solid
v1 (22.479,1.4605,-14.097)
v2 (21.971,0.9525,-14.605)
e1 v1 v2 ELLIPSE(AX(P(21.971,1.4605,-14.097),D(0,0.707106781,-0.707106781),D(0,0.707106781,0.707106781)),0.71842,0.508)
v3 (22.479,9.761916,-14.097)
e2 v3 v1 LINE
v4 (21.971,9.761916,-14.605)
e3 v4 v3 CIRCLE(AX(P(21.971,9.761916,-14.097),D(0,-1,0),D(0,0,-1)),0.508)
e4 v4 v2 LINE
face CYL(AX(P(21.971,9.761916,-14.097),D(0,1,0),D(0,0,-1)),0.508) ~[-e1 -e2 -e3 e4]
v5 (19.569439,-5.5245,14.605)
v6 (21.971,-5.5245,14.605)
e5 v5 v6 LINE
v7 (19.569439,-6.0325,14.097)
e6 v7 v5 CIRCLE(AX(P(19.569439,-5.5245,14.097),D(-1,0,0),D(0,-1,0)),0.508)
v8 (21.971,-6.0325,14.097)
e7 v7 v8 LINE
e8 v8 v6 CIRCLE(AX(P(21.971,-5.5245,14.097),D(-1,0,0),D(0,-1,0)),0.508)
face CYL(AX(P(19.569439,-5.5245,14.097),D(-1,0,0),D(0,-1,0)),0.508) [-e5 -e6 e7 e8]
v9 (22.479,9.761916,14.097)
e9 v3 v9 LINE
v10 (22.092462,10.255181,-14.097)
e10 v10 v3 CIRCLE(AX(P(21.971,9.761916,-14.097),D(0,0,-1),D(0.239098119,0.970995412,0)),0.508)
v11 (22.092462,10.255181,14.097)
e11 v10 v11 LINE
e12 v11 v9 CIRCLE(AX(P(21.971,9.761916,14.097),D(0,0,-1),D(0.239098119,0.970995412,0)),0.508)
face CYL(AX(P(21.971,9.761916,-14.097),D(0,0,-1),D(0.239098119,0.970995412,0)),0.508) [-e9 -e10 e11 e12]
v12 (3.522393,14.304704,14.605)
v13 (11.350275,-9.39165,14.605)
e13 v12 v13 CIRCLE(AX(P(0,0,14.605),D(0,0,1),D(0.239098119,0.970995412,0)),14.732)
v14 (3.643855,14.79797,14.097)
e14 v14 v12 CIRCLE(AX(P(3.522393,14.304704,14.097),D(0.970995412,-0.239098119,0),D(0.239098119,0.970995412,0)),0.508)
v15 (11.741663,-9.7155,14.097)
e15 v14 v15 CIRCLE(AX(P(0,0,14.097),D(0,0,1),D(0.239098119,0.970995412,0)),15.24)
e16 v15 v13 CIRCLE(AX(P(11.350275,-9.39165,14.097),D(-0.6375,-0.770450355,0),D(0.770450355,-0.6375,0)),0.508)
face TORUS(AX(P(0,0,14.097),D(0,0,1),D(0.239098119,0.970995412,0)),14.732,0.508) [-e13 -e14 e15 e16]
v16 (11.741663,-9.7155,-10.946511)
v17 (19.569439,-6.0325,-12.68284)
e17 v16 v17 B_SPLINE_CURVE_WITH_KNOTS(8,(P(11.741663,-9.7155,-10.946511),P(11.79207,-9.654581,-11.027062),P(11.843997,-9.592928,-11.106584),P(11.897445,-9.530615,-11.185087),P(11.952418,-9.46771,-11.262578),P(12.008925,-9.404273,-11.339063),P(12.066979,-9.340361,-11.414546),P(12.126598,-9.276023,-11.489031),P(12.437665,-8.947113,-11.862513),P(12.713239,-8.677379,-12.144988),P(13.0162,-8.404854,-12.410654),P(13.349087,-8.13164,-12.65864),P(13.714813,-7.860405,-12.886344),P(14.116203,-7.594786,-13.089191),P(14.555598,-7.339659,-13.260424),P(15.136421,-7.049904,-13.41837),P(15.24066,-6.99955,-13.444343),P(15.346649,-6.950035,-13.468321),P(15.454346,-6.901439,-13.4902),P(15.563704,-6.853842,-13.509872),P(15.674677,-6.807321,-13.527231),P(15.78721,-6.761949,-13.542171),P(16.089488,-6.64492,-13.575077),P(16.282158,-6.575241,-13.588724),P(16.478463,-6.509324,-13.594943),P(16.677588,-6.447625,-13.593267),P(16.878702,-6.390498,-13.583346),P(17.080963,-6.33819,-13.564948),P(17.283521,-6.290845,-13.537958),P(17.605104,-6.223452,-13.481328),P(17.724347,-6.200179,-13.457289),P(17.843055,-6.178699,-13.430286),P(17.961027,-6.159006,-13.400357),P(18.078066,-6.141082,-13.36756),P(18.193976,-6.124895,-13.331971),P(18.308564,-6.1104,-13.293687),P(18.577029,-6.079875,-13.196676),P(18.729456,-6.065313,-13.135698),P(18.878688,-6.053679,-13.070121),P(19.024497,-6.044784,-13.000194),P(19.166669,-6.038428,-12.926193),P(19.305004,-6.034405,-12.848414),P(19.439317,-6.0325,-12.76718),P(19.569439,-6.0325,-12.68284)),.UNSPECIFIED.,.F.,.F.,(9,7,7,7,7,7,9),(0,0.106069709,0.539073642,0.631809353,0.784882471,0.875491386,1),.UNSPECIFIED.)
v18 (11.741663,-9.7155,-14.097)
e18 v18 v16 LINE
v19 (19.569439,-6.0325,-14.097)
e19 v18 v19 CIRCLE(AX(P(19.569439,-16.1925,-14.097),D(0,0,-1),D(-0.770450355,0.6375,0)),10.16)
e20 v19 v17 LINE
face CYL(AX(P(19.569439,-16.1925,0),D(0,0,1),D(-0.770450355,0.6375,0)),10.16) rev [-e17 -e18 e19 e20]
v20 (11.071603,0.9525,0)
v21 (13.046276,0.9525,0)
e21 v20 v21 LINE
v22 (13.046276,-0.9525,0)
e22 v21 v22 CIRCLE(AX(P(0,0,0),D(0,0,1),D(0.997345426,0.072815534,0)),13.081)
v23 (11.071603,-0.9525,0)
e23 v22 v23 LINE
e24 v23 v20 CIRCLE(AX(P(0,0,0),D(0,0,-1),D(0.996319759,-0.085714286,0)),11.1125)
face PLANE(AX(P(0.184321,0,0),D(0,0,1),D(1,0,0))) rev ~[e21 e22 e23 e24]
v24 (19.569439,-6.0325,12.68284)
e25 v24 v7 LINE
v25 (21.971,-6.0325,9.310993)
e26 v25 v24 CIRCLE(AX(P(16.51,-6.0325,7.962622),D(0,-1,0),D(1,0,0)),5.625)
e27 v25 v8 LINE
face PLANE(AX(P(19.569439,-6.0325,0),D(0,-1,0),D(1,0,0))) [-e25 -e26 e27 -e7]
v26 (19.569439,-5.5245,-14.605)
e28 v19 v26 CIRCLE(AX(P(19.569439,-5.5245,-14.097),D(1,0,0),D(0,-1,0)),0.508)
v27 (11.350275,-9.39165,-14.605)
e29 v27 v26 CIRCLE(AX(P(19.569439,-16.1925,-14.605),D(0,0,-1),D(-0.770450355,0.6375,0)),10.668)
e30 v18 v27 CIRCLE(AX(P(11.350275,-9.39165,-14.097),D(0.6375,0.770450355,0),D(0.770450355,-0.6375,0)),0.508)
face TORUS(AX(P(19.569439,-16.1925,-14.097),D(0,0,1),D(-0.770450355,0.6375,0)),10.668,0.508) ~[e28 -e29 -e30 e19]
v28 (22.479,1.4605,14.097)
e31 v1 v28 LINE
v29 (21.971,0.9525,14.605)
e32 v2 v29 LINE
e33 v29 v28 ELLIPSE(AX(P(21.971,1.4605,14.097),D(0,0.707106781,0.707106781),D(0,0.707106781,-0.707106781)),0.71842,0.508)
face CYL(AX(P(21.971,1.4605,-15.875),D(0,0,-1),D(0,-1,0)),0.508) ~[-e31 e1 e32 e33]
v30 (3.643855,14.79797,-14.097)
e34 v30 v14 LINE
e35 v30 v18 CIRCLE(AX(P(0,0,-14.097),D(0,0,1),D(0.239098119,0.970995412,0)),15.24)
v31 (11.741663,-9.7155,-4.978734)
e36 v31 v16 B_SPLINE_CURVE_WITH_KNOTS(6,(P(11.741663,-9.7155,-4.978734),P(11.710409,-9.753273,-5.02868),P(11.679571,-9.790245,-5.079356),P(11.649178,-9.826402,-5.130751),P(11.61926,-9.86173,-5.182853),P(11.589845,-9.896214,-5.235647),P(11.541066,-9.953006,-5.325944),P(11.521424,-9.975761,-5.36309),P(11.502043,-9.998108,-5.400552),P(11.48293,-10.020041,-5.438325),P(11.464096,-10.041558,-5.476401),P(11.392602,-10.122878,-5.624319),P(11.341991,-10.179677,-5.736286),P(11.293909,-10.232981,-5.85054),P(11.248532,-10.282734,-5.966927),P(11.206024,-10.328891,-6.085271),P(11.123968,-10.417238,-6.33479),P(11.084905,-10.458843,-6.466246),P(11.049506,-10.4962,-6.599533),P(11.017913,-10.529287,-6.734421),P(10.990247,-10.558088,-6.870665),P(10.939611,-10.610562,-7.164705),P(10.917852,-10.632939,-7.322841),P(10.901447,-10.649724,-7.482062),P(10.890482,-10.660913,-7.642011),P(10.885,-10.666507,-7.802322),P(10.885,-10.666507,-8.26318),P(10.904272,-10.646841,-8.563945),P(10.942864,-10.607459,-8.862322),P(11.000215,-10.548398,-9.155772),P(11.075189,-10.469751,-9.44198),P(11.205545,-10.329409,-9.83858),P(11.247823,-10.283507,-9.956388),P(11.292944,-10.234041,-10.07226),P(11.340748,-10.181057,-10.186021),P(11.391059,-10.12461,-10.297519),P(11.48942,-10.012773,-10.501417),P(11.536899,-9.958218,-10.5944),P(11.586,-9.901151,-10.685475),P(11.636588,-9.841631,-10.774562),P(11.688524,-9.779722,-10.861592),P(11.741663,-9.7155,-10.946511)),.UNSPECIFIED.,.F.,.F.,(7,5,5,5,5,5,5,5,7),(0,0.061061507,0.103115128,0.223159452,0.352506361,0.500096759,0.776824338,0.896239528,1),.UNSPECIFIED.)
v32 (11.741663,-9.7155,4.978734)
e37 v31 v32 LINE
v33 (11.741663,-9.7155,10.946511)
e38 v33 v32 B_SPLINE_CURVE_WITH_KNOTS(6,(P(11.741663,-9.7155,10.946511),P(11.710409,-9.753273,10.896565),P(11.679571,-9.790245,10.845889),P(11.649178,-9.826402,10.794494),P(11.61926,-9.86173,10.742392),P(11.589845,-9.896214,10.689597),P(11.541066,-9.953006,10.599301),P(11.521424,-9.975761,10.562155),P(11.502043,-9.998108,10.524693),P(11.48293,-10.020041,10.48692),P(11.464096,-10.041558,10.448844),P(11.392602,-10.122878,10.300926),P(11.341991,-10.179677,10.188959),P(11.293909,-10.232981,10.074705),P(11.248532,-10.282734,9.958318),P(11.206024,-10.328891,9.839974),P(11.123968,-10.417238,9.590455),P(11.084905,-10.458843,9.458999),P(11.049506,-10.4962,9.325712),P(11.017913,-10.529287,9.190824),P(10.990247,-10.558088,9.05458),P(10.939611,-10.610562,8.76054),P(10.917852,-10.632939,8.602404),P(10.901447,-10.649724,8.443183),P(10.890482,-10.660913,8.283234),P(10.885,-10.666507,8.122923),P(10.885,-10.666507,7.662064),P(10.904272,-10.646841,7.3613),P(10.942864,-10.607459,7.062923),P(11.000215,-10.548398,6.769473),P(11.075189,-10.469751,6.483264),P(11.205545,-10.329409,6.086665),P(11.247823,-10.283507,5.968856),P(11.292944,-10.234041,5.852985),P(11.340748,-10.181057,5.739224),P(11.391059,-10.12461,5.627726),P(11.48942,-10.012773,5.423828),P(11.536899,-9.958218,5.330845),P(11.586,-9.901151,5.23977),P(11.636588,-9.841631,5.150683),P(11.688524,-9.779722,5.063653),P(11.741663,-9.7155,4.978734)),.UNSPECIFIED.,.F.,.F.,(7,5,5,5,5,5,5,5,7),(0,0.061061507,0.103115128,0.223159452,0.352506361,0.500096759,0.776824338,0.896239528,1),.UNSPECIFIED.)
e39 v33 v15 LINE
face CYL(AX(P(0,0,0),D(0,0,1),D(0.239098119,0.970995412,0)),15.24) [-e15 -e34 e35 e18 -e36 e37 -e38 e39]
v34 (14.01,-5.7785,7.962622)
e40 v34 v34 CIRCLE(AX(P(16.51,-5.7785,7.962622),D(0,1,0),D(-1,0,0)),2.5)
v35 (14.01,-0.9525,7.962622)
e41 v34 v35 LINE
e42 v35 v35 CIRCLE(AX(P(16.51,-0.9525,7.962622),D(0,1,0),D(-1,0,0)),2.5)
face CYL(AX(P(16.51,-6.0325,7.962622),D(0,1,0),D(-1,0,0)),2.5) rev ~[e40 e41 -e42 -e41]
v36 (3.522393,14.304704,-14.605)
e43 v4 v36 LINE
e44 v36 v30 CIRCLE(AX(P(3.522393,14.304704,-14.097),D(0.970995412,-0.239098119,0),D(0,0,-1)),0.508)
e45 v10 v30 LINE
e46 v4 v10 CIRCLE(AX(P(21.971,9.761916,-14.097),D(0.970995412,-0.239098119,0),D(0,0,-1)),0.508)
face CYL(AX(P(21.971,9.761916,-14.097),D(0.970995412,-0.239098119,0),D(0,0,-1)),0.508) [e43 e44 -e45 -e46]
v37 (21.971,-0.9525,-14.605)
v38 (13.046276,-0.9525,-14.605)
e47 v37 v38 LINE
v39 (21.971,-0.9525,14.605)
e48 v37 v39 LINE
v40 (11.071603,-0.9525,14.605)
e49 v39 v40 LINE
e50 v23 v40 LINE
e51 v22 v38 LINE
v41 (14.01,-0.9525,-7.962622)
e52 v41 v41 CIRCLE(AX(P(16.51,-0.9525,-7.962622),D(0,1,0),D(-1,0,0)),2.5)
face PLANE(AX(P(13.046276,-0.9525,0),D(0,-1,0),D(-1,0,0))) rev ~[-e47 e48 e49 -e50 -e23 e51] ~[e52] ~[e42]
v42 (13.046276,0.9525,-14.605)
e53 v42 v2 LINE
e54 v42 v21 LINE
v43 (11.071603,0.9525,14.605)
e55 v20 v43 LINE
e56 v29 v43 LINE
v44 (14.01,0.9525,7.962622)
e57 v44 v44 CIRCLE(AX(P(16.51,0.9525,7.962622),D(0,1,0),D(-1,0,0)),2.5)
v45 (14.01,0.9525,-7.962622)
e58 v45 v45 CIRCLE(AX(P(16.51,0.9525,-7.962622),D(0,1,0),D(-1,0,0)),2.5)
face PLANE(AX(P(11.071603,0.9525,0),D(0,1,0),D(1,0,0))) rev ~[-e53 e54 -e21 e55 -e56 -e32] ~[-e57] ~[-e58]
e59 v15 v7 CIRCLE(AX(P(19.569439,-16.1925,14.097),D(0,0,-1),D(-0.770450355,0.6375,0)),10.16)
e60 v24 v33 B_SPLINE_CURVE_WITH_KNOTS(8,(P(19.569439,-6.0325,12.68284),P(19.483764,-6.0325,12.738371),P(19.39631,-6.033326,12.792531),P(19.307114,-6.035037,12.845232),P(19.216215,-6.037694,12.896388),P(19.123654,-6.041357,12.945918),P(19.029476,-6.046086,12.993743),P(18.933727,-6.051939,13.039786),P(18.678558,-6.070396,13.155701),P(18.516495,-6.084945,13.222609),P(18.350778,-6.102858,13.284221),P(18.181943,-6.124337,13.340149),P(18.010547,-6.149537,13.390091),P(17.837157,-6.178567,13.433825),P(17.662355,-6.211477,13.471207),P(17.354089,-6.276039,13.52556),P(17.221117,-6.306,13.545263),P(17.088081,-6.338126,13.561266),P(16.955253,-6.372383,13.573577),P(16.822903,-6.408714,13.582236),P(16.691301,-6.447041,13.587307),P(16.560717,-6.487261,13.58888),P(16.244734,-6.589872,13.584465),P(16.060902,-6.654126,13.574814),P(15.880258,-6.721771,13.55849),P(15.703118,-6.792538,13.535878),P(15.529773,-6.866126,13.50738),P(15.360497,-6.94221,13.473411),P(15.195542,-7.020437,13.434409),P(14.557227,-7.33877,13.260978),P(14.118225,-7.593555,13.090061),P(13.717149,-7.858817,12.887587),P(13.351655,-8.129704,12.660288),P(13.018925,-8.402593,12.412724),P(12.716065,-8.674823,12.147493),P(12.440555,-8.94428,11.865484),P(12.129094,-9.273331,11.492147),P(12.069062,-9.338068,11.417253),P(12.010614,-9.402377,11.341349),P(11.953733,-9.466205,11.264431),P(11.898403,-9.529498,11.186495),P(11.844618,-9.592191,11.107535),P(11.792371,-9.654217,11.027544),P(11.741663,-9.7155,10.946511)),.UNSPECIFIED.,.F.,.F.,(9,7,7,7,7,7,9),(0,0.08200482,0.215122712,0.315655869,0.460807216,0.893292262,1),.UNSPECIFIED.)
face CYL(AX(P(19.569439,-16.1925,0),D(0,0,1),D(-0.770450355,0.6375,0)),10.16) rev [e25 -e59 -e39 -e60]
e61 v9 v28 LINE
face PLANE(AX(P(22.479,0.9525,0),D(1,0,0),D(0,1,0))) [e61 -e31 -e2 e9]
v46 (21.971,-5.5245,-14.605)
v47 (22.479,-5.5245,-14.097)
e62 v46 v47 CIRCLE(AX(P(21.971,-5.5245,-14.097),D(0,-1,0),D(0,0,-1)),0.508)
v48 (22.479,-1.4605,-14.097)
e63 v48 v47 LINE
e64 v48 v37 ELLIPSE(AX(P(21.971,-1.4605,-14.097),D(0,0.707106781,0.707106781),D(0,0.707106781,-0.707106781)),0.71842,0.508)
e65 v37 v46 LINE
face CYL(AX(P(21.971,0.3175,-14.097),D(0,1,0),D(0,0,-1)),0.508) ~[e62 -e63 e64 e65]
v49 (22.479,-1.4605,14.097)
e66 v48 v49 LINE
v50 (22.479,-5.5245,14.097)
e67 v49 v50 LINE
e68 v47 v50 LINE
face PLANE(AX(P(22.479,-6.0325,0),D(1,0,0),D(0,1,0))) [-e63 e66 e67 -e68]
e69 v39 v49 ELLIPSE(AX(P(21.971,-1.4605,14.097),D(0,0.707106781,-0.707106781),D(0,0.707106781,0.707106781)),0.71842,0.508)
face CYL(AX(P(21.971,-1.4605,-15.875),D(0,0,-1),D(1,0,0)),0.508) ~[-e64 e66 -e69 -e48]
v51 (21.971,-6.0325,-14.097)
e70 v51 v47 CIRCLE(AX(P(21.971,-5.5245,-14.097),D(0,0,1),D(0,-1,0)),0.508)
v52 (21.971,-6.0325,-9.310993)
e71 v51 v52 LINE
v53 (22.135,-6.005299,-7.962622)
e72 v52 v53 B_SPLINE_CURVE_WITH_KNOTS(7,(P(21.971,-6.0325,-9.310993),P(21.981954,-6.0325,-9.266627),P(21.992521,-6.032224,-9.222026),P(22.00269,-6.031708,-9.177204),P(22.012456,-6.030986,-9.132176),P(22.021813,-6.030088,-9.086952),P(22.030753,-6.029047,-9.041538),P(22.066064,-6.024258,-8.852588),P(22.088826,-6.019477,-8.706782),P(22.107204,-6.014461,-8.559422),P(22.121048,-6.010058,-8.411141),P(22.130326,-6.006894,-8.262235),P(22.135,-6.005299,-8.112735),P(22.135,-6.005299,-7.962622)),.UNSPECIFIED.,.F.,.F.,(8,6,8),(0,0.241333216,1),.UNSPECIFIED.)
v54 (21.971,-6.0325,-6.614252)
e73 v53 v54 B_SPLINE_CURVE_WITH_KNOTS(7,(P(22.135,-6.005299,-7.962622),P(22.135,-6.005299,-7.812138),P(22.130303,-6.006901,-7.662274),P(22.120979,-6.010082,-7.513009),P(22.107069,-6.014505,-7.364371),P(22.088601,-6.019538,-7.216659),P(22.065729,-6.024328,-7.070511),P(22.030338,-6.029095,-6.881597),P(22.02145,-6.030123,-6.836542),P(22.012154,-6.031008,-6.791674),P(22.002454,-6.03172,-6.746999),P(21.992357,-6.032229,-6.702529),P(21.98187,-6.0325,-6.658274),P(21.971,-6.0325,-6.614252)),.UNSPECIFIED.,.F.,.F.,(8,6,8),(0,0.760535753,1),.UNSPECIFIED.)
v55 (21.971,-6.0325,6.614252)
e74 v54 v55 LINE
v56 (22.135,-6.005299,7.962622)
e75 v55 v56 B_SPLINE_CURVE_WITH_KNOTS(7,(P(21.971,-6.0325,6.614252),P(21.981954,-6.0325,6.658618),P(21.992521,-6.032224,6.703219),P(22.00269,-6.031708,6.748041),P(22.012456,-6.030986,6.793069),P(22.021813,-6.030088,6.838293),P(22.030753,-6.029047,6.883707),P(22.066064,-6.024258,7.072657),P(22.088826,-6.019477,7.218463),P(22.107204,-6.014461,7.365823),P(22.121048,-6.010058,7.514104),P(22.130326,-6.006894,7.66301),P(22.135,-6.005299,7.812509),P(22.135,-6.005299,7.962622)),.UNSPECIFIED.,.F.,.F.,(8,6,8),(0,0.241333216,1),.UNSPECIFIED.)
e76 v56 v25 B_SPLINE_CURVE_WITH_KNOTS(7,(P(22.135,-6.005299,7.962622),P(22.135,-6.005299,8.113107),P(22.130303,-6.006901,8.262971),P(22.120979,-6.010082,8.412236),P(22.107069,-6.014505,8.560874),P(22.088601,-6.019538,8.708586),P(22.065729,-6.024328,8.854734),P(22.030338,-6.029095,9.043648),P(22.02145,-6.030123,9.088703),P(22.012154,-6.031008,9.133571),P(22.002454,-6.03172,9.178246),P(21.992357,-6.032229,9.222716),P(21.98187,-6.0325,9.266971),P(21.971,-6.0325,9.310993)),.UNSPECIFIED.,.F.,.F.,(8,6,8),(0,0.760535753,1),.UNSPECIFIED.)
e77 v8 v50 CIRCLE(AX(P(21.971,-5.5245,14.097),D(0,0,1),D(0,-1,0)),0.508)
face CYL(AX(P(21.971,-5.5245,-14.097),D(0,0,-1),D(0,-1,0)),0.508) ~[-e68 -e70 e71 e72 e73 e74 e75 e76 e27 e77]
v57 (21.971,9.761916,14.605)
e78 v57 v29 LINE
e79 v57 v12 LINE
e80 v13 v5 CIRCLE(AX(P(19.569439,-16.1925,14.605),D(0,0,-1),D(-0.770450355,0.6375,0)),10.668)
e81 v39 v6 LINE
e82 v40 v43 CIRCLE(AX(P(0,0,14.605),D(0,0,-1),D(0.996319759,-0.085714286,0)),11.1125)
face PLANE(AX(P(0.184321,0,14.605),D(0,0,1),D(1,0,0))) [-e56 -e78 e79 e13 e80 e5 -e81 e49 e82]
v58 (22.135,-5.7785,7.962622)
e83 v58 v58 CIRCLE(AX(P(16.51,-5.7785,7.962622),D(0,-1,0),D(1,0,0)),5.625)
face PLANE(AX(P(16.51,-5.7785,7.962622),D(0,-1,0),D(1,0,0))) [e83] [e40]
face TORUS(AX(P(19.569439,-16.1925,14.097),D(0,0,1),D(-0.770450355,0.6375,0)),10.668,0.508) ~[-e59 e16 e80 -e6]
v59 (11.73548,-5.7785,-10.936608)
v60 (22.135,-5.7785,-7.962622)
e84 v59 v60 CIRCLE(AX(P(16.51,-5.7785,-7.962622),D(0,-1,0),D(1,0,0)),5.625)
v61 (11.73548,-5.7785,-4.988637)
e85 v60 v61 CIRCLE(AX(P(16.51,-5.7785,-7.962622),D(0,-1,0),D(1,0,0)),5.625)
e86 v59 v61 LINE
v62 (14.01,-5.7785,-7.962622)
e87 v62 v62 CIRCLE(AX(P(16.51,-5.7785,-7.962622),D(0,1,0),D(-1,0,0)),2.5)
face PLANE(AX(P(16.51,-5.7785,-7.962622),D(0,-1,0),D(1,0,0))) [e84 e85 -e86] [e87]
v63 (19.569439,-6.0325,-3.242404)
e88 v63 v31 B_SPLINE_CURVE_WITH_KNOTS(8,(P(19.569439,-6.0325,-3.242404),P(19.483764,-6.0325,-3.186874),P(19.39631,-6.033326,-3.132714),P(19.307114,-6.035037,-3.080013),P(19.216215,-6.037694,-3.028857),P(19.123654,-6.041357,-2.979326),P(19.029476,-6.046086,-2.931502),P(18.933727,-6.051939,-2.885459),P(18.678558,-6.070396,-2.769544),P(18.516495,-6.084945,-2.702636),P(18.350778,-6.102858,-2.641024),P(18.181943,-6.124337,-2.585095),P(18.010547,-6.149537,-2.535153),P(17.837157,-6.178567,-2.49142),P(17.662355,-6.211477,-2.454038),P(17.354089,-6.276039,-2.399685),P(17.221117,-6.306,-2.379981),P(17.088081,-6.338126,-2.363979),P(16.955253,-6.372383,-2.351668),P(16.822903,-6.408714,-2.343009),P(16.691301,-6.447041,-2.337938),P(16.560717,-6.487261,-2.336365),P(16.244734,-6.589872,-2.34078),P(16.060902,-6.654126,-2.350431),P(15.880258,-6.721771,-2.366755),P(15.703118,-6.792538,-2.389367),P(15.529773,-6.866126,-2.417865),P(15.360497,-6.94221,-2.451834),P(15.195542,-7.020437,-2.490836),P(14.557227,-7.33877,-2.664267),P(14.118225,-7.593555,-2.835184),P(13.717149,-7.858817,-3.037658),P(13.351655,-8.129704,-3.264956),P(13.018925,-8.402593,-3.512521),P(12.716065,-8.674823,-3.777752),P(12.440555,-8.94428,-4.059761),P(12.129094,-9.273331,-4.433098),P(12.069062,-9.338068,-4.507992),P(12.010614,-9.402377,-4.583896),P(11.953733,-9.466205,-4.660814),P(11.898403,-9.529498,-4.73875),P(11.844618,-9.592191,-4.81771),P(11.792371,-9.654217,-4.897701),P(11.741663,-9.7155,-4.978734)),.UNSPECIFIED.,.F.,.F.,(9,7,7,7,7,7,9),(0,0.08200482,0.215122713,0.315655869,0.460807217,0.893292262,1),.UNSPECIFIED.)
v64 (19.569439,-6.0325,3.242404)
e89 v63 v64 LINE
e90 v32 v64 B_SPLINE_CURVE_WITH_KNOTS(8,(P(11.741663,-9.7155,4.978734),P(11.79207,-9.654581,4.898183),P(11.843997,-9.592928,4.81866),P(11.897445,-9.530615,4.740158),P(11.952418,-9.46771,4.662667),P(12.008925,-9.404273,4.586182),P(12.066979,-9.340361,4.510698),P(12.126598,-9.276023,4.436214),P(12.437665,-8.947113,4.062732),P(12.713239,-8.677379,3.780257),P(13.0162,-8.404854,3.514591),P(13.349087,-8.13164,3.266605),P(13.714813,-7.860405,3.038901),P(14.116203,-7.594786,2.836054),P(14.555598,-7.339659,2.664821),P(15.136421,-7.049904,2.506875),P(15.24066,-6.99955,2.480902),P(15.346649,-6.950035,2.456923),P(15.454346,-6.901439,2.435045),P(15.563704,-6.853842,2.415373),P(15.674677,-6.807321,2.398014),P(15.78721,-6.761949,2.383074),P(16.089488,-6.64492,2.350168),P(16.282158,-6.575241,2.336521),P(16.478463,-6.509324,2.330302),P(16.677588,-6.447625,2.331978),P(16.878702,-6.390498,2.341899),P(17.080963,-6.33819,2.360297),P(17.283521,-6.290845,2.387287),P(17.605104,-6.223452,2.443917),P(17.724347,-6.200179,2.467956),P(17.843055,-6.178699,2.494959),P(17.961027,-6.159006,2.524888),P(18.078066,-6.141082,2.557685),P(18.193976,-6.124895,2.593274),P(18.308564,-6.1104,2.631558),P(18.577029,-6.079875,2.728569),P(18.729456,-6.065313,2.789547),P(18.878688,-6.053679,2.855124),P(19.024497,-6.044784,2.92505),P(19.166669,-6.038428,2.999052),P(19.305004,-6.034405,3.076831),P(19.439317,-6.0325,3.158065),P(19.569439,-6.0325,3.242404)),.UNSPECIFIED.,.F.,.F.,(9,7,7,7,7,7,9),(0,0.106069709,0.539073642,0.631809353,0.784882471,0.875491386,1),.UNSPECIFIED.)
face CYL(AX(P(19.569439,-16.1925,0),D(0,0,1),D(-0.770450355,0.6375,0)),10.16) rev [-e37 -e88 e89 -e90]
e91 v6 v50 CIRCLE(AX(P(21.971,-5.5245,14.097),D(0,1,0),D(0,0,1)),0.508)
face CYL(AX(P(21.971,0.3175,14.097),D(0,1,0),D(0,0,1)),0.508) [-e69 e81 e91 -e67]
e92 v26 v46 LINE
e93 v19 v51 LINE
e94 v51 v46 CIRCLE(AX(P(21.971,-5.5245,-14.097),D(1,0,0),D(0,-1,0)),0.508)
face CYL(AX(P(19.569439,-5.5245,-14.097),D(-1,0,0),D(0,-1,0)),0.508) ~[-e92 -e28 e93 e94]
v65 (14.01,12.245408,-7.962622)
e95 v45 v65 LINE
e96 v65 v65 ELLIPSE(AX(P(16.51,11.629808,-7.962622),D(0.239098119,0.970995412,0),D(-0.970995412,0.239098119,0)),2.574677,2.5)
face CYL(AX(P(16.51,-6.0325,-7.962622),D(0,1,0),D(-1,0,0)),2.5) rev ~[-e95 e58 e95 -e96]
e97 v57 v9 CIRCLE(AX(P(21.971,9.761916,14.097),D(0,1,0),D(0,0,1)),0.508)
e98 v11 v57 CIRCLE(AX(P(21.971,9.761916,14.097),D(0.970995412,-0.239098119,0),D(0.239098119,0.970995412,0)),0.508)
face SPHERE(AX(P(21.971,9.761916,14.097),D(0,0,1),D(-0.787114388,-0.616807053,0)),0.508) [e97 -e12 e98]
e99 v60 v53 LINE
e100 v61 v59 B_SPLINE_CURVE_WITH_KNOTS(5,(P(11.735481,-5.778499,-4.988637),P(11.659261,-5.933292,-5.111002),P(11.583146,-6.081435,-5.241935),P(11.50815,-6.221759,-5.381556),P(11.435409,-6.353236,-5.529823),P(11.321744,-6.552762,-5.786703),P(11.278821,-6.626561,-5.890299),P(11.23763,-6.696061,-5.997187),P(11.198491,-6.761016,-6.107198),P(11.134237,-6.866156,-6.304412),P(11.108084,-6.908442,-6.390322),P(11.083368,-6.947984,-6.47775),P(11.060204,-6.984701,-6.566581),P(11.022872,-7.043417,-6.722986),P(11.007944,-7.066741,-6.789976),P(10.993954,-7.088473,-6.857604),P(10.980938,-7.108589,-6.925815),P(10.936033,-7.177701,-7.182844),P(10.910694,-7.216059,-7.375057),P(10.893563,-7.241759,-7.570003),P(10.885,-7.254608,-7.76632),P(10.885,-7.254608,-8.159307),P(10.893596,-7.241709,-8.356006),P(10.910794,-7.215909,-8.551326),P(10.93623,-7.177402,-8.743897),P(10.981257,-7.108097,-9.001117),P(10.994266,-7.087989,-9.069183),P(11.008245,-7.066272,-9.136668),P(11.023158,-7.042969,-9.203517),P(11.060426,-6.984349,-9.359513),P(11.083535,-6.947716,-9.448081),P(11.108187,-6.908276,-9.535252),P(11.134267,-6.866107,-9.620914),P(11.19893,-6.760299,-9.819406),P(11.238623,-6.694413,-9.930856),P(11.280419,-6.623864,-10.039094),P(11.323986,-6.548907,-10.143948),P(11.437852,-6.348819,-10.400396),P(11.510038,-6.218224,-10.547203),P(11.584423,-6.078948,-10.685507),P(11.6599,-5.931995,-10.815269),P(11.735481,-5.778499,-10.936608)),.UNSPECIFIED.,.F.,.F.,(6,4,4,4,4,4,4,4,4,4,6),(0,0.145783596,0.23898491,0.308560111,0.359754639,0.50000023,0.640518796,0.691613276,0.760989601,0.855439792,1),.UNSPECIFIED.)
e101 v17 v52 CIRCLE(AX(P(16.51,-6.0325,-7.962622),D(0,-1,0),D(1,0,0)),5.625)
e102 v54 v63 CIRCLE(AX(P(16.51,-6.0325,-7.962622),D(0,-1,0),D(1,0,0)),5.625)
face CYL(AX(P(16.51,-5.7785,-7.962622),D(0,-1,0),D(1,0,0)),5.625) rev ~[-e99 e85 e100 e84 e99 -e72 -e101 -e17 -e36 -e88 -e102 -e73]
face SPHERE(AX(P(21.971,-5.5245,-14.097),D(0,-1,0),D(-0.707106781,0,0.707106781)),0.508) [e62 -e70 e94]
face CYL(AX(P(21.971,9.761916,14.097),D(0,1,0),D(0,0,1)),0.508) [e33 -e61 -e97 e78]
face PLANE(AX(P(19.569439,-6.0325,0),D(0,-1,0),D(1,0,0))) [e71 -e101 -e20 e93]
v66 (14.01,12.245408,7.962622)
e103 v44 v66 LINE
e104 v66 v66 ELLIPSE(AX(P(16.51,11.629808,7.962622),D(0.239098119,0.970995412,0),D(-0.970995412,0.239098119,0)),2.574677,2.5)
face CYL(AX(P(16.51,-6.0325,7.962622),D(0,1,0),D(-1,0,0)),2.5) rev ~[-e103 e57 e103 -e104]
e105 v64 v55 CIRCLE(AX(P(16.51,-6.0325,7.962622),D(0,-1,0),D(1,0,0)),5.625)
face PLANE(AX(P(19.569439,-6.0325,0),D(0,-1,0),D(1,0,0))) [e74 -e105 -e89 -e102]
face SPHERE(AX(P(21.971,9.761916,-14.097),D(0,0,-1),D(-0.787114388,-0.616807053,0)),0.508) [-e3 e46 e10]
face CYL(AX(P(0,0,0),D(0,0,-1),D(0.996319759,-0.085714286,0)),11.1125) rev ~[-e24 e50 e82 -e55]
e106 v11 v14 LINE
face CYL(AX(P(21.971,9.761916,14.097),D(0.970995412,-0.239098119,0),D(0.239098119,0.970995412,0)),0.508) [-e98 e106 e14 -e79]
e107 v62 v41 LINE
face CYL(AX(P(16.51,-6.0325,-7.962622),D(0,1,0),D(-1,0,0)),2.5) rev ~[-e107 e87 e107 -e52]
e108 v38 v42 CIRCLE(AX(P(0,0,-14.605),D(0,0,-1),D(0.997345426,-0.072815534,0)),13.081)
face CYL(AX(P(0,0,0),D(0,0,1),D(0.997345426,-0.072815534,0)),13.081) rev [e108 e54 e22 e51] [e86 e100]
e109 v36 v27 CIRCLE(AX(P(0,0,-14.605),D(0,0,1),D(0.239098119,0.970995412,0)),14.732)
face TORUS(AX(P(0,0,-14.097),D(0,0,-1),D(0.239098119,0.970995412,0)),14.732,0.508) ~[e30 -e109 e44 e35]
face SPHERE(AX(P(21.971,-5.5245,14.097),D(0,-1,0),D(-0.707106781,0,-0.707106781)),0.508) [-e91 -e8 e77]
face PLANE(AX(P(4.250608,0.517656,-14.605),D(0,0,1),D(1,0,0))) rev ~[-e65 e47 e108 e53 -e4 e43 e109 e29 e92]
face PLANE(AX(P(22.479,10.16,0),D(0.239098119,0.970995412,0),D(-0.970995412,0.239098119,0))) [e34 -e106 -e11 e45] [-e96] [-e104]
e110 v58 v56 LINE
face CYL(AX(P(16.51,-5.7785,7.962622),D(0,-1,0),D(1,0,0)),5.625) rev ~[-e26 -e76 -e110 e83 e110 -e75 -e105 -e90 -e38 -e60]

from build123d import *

# Parameters (mm, degrees)
F1_DEPTH       = 14.605
F2_DEPTH       = 14.605
F5_D           = 5
F5_DEPTH       = 25.4
F5_START       = 7.9375001
F5_CBORE_D     = 11.25
F5_CBORE_DEPTH = 0.254
F5_TIP         = 1.5021515476
F6_T1_DEPTH    = 10.0794155694
F6_T3_DEPTH    = 28.194
F6_T5_DEPTH    = 18.9996845391
F6_T7_DEPTH    = 2.4015609751
F6_T9_DEPTH    = 5.842
F6_T11_DEPTH   = 31.75
F6_T16_DEPTH   = 0.508
F6_T22_DEPTH   = 0.508
F6_S27_W       = 0.508
F6_S27_H       = 0.508
F6_T28_DEPTH   = 0.508
F6_S33_W       = 0.508
F6_S33_H       = 0.508
F6_T34_DEPTH   = 0.508
F6_T38_ANGLE   = 244.2276643477
F6_T40_ANGLE   = 244.2276643477
F6_T42_ANGLE   = 50.3943476061
F6_T44_ANGLE   = 50.3943476061


# Not quite as in the source:
# - a fillet or chamfer that OpenCascade refuses, or shapes differently, is made with other operations: its cross-section is extruded or revolved along the edge and cut away or added
# - two fillets or chamfers of one size are made in one step
# - a feature names something its author has since deleted; it is built from what else it names


with BuildPart() as f1:
    # F0 (on Top) → F1 (new body, symmetric)
    with BuildSketch(Plane.XY):
        with BuildLine():
            ThreePointArc((13.0462755126, -0.9525), (-13.081, 0), (13.0462755126, 0.9525))
            Line((13.0462755126, 0.9525), (22.479, 0.9525))
            Line((22.479, 0.9525), (22.479, 10.16))
            Line((22.479, 10.16), (3.6438553339, 14.7979700738))
            ThreePointArc((3.6438553339, 14.7979700738), (-14.4708707602, -4.7803241985), (11.741663415, -9.7155))
            ThreePointArc((11.741663415, -9.7155), (15.243974888, -6.999243776), (19.5694390249, -6.0325))
            Line((19.5694390249, -6.0325), (22.479, -6.0325))
            Line((22.479, -6.0325), (22.479, -0.9525))
            Line((22.479, -0.9525), (13.0462755126, -0.9525))
        make_face()
    extrude(amount=F1_DEPTH, both=True)

    # F0 (on Top) → F2 (join, through all)
    with BuildSketch(Plane.XY):
        with BuildLine():
            Line((11.0716033166, 0.9525), (13.0462755126, 0.9525))
            ThreePointArc((13.0462755126, 0.9525), (-13.081, 0), (13.0462755126, -0.9525))
            Line((13.0462755126, -0.9525), (11.0716033166, -0.9525))
            ThreePointArc((11.0716033166, -0.9525), (-11.1125, 0), (11.0716033166, 0.9525))
        make_face()
    extrude(amount=F2_DEPTH)

    # F5
    # its depths count from where the whole tool has entered the part; down to there all is cleared
    with Locations(Plane.XZ.offset(13.97).offset(-F5_START)):
        with Locations((16.51, 7.9626224567), (16.51, -7.9626224567)):
            CounterBoreHole(F5_D / 2, F5_CBORE_D / 2, F5_CBORE_DEPTH, depth=F5_DEPTH)
            with Locations((0, 0, -(F5_DEPTH + F5_TIP / 2))):  # 118° drill point
                Cone(0, F5_D / 2, F5_TIP, mode=Mode.SUBTRACT)

    # F6: fillet of radius 0.508 on 16 edges, made by hand

    # F6_s2 → F6_t1 (cut)
    with BuildSketch(Plane.XZ.offset(-9.7619155694)):
        with BuildLine():
            ThreePointArc((21.971, -14.605), (22.3302102448, -14.4562102448), (22.479, -14.097))
            Line((22.479, -14.097), (22.479, -14.605))
            Line((22.479, -14.605), (21.971, -14.605))
        make_face()
        with BuildLine():
            ThreePointArc((21.971, 14.605), (22.3302102448, 14.4562102448), (22.479, 14.097))
            Line((22.479, 14.097), (22.479, 14.605))
            Line((22.479, 14.605), (21.971, 14.605))
        make_face()
    extrude(amount=F6_T1_DEPTH, mode=Mode.SUBTRACT)

    # F6_s4 → F6_t3 (cut)
    with BuildSketch(Plane.XY.offset(-14.097)):
        with BuildLine():
            ThreePointArc((22.0924618445, 10.2551812386), (22.370854109, 10.0752535523), (22.479, 9.7619155694))
            Line((22.479, 9.7619155694), (22.479, 10.16))
            Line((22.479, 10.16), (22.0924618445, 10.2551812386))
        make_face()
        with BuildLine():
            ThreePointArc((21.971, -6.0325), (22.3302102448, -5.8837102448), (22.479, -5.5245))
            Line((22.479, -5.5245), (22.479, -6.0325))
            Line((22.479, -6.0325), (21.971, -6.0325))
        make_face()
    extrude(amount=F6_T3_DEPTH, mode=Mode.SUBTRACT)

    # F6_s6 → F6_t5 (cut)
    with BuildSketch(Plane(origin=(18.4486065106, -4.5427888353, 0), x_dir=(0, 0, 1), z_dir=(-0.9709954117, 0.239098119, 0))):
        with BuildLine():
            ThreePointArc((14.097, 15.24), (14.4562102448, 15.0912102448), (14.605, 14.732))
            Line((14.605, 14.732), (14.605, 15.24))
            Line((14.605, 15.24), (14.097, 15.24))
        make_face()
        with BuildLine():
            ThreePointArc((-14.605, 14.732), (-14.4562102448, 15.0912102448), (-14.097, 15.24))
            Line((-14.097, 15.24), (-14.605, 15.24))
            Line((-14.605, 15.24), (-14.605, 14.732))
        make_face()
    extrude(amount=F6_T5_DEPTH, mode=Mode.SUBTRACT)

    # F6_s8 → F6_t7 (cut)
    with BuildSketch(Plane.YZ.offset(19.5694390249)):
        with BuildLine():
            ThreePointArc((-6.0325, 14.097), (-5.8837102448, 14.4562102448), (-5.5245, 14.605))
            Line((-5.5245, 14.605), (-6.0325, 14.605))
            Line((-6.0325, 14.605), (-6.0325, 14.097))
        make_face()
        with BuildLine():
            ThreePointArc((-6.0325, -14.097), (-5.8837102448, -14.4562102448), (-5.5245, -14.605))
            Line((-5.5245, -14.605), (-6.0325, -14.605))
            Line((-6.0325, -14.605), (-6.0325, -14.097))
        make_face()
    extrude(amount=F6_T7_DEPTH, mode=Mode.SUBTRACT)

    # F6_s10 → F6_t9 (cut)
    with BuildSketch(Plane.XZ.offset(-0.3175)):
        with BuildLine():
            ThreePointArc((21.971, -14.605), (22.3302102448, -14.4562102448), (22.479, -14.097))
            Line((22.479, -14.097), (22.479, -14.605))
            Line((22.479, -14.605), (21.971, -14.605))
        make_face()
        with BuildLine():
            ThreePointArc((21.971, 14.605), (22.3302102448, 14.4562102448), (22.479, 14.097))
            Line((22.479, 14.097), (22.479, 14.605))
            Line((22.479, 14.605), (21.971, 14.605))
        make_face()
    extrude(amount=F6_T9_DEPTH, mode=Mode.SUBTRACT)

    # F6_s12 → F6_t11 (cut)
    with BuildSketch(Plane.XY.offset(-15.875)):
        with BuildLine():
            ThreePointArc((22.479, -1.4605), (22.3302102448, -1.1012897552), (21.971, -0.9525))
            Line((21.971, -0.9525), (22.479, -0.9525))
            Line((22.479, -0.9525), (22.479, -1.4605))
        make_face()
        with BuildLine():
            ThreePointArc((21.971, 0.9525), (22.3302102448, 1.1012897552), (22.479, 1.4605))
            Line((22.479, 1.4605), (22.479, 0.9525))
            Line((22.479, 0.9525), (21.971, 0.9525))
        make_face()
    extrude(amount=F6_T11_DEPTH, mode=Mode.SUBTRACT)


with BuildPart() as f6_tool14:
    # F6_s15 → F6_t16 (new body)
    with BuildSketch(Plane.XY.offset(-14.097)):
        Polygon((21.971, 9.7619155694), (22.0924618445, 10.2551812386), (22.479, 10.16), (22.479, 9.7619155694), align=None)
    extrude(amount=-F6_T16_DEPTH)

    # F6_s17 → F6_t18 (revolve, cut)
    with BuildSketch(Plane(origin=(21.971, 9.7619155694, -14.097), x_dir=(-0.7871143878, -0.6168070529, 0), z_dir=(0.6168070529, -0.7871143878, 0))):
        with BuildLine():
            ThreePointArc((0, -0.508), (0.508, 0), (0, 0.508))
            Line((0, 0.508), (0, -0.508))
        make_face()
    revolve(axis=Axis((21.971, 9.7619155694, -14.097), (0, 0, -1)), mode=Mode.SUBTRACT)


with BuildPart() as f1_1:
    add(f1.part)

    # F6_t13: cut F6_tool14
    add(f6_tool14.part, mode=Mode.SUBTRACT)


with BuildPart() as f6_tool20:
    # F6_s21 → F6_t22 (new body)
    with BuildSketch(Plane.XY.offset(14.097)):
        Polygon((21.971, 9.7619155694), (22.479, 9.7619155694), (22.479, 10.16), (22.0924618445, 10.2551812386), align=None)
    extrude(amount=F6_T22_DEPTH)

    # F6_s23 → F6_t24 (revolve, cut)
    with BuildSketch(Plane(origin=(21.971, 9.7619155694, 14.097), x_dir=(-0.7871143878, -0.6168070529, 0), z_dir=(-0.6168070529, 0.7871143878, 0))):
        with BuildLine():
            ThreePointArc((0, -0.508), (0.508, 0), (0, 0.508))
            Line((0, 0.508), (0, -0.508))
        make_face()
    revolve(axis=Axis((21.971, 9.7619155694, 14.097), (0, 0, 1)), mode=Mode.SUBTRACT)


with BuildPart() as f1_2:
    add(f1_1.part)

    # F6_t19: cut F6_tool20
    add(f6_tool20.part, mode=Mode.SUBTRACT)


with BuildPart() as f6_tool26:
    # F6_s27 → F6_t28 (new body)
    with BuildSketch(Plane.XZ.offset(5.5245)):
        with Locations((22.225, 14.351)):
            Rectangle(F6_S27_W, F6_S27_H)
    extrude(amount=F6_T28_DEPTH)

    # F6_s29 → F6_t30 (revolve, cut)
    with BuildSketch(Plane(origin=(21.971, -5.5245, 14.097), x_dir=(-0.7071067812, 0, -0.7071067812), z_dir=(-0.7071067812, 0, 0.7071067812))):
        with BuildLine():
            ThreePointArc((0, -0.508), (0.508, 0), (0, 0.508))
            Line((0, 0.508), (0, -0.508))
        make_face()
    revolve(axis=Axis((21.971, -5.5245, 14.097), (0, -1, 0)), mode=Mode.SUBTRACT)


with BuildPart() as f1_3:
    add(f1_2.part)

    # F6_t25: cut F6_tool26
    add(f6_tool26.part, mode=Mode.SUBTRACT)


with BuildPart() as f6_tool32:
    # F6_s33 → F6_t34 (new body)
    with BuildSketch(Plane.XZ.offset(5.5245)):
        with Locations((22.225, -14.351)):
            Rectangle(F6_S33_W, F6_S33_H)
    extrude(amount=F6_T34_DEPTH)

    # F6_s35 → F6_t36 (revolve, cut)
    with BuildSketch(Plane(origin=(21.971, -5.5245, -14.097), x_dir=(-0.7071067812, 0, 0.7071067812), z_dir=(0.7071067812, 0, 0.7071067812))):
        with BuildLine():
            ThreePointArc((0, -0.508), (0.508, 0), (0, 0.508))
            Line((0, 0.508), (0, -0.508))
        make_face()
    revolve(axis=Axis((21.971, -5.5245, -14.097), (0, -1, 0)), mode=Mode.SUBTRACT)


with BuildPart() as f1_4:
    add(f1_3.part)

    # F6_t31: cut F6_tool32
    add(f6_tool32.part, mode=Mode.SUBTRACT)

    # F6_s37 → F6_t38 (revolve, cut)
    with BuildSketch(Plane(origin=(0, 0, 0), x_dir=(0, 0, 1), z_dir=(0.9709954117, -0.239098119, 0))):
        with BuildLine():
            ThreePointArc((-14.097, -15.24), (-14.4562102448, -15.0912102448), (-14.605, -14.732))
            Line((-14.605, -14.732), (-14.605, -15.24))
            Line((-14.605, -15.24), (-14.097, -15.24))
        make_face()
    revolve(axis=Axis((0, 0, -14.605), (0, 0, 1)), revolution_arc=F6_T38_ANGLE, mode=Mode.SUBTRACT)

    # F6_s39 → F6_t40 (revolve, cut)
    with BuildSketch(Plane(origin=(0, 0, 0), x_dir=(0, 0, 1), z_dir=(0.9709954117, -0.239098119, 0))):
        with BuildLine():
            ThreePointArc((14.097, -15.24), (14.4562102448, -15.0912102448), (14.605, -14.732))
            Line((14.605, -14.732), (14.605, -15.24))
            Line((14.605, -15.24), (14.097, -15.24))
        make_face()
    revolve(axis=Axis((0, 0, 14.605), (0, 0, 1)), revolution_arc=F6_T40_ANGLE, mode=Mode.SUBTRACT)

    # F6_s41 → F6_t42 (revolve, cut)
    with BuildSketch(Plane(origin=(0, 0, 0), x_dir=(0, 0, 1), z_dir=(-0.6375, -0.7704503553, 0))):
        with BuildLine():
            ThreePointArc((-14.097, -15.24), (-14.4562102448, -15.0912102448), (-14.605, -14.732))
            Line((-14.605, -14.732), (-14.605, -15.24))
            Line((-14.605, -15.24), (-14.097, -15.24))
        make_face()
    revolve(axis=Axis((19.5694390249, -16.1925, -14.605), (0, 0, -1)), revolution_arc=F6_T42_ANGLE, mode=Mode.SUBTRACT)

    # F6_s43 → F6_t44 (revolve, cut)
    with BuildSketch(Plane(origin=(0, 0, 0), x_dir=(0, 0, 1), z_dir=(-0.6375, -0.7704503553, 0))):
        with BuildLine():
            ThreePointArc((14.605, -14.732), (14.4562102448, -15.0912102448), (14.097, -15.24))
            Line((14.097, -15.24), (14.605, -15.24))
            Line((14.605, -15.24), (14.605, -14.732))
        make_face()
    revolve(axis=Axis((19.5694390249, -16.1925, 14.605), (0, 0, -1)), revolution_arc=F6_T44_ANGLE, mode=Mode.SUBTRACT)


solid = f1_4.part
